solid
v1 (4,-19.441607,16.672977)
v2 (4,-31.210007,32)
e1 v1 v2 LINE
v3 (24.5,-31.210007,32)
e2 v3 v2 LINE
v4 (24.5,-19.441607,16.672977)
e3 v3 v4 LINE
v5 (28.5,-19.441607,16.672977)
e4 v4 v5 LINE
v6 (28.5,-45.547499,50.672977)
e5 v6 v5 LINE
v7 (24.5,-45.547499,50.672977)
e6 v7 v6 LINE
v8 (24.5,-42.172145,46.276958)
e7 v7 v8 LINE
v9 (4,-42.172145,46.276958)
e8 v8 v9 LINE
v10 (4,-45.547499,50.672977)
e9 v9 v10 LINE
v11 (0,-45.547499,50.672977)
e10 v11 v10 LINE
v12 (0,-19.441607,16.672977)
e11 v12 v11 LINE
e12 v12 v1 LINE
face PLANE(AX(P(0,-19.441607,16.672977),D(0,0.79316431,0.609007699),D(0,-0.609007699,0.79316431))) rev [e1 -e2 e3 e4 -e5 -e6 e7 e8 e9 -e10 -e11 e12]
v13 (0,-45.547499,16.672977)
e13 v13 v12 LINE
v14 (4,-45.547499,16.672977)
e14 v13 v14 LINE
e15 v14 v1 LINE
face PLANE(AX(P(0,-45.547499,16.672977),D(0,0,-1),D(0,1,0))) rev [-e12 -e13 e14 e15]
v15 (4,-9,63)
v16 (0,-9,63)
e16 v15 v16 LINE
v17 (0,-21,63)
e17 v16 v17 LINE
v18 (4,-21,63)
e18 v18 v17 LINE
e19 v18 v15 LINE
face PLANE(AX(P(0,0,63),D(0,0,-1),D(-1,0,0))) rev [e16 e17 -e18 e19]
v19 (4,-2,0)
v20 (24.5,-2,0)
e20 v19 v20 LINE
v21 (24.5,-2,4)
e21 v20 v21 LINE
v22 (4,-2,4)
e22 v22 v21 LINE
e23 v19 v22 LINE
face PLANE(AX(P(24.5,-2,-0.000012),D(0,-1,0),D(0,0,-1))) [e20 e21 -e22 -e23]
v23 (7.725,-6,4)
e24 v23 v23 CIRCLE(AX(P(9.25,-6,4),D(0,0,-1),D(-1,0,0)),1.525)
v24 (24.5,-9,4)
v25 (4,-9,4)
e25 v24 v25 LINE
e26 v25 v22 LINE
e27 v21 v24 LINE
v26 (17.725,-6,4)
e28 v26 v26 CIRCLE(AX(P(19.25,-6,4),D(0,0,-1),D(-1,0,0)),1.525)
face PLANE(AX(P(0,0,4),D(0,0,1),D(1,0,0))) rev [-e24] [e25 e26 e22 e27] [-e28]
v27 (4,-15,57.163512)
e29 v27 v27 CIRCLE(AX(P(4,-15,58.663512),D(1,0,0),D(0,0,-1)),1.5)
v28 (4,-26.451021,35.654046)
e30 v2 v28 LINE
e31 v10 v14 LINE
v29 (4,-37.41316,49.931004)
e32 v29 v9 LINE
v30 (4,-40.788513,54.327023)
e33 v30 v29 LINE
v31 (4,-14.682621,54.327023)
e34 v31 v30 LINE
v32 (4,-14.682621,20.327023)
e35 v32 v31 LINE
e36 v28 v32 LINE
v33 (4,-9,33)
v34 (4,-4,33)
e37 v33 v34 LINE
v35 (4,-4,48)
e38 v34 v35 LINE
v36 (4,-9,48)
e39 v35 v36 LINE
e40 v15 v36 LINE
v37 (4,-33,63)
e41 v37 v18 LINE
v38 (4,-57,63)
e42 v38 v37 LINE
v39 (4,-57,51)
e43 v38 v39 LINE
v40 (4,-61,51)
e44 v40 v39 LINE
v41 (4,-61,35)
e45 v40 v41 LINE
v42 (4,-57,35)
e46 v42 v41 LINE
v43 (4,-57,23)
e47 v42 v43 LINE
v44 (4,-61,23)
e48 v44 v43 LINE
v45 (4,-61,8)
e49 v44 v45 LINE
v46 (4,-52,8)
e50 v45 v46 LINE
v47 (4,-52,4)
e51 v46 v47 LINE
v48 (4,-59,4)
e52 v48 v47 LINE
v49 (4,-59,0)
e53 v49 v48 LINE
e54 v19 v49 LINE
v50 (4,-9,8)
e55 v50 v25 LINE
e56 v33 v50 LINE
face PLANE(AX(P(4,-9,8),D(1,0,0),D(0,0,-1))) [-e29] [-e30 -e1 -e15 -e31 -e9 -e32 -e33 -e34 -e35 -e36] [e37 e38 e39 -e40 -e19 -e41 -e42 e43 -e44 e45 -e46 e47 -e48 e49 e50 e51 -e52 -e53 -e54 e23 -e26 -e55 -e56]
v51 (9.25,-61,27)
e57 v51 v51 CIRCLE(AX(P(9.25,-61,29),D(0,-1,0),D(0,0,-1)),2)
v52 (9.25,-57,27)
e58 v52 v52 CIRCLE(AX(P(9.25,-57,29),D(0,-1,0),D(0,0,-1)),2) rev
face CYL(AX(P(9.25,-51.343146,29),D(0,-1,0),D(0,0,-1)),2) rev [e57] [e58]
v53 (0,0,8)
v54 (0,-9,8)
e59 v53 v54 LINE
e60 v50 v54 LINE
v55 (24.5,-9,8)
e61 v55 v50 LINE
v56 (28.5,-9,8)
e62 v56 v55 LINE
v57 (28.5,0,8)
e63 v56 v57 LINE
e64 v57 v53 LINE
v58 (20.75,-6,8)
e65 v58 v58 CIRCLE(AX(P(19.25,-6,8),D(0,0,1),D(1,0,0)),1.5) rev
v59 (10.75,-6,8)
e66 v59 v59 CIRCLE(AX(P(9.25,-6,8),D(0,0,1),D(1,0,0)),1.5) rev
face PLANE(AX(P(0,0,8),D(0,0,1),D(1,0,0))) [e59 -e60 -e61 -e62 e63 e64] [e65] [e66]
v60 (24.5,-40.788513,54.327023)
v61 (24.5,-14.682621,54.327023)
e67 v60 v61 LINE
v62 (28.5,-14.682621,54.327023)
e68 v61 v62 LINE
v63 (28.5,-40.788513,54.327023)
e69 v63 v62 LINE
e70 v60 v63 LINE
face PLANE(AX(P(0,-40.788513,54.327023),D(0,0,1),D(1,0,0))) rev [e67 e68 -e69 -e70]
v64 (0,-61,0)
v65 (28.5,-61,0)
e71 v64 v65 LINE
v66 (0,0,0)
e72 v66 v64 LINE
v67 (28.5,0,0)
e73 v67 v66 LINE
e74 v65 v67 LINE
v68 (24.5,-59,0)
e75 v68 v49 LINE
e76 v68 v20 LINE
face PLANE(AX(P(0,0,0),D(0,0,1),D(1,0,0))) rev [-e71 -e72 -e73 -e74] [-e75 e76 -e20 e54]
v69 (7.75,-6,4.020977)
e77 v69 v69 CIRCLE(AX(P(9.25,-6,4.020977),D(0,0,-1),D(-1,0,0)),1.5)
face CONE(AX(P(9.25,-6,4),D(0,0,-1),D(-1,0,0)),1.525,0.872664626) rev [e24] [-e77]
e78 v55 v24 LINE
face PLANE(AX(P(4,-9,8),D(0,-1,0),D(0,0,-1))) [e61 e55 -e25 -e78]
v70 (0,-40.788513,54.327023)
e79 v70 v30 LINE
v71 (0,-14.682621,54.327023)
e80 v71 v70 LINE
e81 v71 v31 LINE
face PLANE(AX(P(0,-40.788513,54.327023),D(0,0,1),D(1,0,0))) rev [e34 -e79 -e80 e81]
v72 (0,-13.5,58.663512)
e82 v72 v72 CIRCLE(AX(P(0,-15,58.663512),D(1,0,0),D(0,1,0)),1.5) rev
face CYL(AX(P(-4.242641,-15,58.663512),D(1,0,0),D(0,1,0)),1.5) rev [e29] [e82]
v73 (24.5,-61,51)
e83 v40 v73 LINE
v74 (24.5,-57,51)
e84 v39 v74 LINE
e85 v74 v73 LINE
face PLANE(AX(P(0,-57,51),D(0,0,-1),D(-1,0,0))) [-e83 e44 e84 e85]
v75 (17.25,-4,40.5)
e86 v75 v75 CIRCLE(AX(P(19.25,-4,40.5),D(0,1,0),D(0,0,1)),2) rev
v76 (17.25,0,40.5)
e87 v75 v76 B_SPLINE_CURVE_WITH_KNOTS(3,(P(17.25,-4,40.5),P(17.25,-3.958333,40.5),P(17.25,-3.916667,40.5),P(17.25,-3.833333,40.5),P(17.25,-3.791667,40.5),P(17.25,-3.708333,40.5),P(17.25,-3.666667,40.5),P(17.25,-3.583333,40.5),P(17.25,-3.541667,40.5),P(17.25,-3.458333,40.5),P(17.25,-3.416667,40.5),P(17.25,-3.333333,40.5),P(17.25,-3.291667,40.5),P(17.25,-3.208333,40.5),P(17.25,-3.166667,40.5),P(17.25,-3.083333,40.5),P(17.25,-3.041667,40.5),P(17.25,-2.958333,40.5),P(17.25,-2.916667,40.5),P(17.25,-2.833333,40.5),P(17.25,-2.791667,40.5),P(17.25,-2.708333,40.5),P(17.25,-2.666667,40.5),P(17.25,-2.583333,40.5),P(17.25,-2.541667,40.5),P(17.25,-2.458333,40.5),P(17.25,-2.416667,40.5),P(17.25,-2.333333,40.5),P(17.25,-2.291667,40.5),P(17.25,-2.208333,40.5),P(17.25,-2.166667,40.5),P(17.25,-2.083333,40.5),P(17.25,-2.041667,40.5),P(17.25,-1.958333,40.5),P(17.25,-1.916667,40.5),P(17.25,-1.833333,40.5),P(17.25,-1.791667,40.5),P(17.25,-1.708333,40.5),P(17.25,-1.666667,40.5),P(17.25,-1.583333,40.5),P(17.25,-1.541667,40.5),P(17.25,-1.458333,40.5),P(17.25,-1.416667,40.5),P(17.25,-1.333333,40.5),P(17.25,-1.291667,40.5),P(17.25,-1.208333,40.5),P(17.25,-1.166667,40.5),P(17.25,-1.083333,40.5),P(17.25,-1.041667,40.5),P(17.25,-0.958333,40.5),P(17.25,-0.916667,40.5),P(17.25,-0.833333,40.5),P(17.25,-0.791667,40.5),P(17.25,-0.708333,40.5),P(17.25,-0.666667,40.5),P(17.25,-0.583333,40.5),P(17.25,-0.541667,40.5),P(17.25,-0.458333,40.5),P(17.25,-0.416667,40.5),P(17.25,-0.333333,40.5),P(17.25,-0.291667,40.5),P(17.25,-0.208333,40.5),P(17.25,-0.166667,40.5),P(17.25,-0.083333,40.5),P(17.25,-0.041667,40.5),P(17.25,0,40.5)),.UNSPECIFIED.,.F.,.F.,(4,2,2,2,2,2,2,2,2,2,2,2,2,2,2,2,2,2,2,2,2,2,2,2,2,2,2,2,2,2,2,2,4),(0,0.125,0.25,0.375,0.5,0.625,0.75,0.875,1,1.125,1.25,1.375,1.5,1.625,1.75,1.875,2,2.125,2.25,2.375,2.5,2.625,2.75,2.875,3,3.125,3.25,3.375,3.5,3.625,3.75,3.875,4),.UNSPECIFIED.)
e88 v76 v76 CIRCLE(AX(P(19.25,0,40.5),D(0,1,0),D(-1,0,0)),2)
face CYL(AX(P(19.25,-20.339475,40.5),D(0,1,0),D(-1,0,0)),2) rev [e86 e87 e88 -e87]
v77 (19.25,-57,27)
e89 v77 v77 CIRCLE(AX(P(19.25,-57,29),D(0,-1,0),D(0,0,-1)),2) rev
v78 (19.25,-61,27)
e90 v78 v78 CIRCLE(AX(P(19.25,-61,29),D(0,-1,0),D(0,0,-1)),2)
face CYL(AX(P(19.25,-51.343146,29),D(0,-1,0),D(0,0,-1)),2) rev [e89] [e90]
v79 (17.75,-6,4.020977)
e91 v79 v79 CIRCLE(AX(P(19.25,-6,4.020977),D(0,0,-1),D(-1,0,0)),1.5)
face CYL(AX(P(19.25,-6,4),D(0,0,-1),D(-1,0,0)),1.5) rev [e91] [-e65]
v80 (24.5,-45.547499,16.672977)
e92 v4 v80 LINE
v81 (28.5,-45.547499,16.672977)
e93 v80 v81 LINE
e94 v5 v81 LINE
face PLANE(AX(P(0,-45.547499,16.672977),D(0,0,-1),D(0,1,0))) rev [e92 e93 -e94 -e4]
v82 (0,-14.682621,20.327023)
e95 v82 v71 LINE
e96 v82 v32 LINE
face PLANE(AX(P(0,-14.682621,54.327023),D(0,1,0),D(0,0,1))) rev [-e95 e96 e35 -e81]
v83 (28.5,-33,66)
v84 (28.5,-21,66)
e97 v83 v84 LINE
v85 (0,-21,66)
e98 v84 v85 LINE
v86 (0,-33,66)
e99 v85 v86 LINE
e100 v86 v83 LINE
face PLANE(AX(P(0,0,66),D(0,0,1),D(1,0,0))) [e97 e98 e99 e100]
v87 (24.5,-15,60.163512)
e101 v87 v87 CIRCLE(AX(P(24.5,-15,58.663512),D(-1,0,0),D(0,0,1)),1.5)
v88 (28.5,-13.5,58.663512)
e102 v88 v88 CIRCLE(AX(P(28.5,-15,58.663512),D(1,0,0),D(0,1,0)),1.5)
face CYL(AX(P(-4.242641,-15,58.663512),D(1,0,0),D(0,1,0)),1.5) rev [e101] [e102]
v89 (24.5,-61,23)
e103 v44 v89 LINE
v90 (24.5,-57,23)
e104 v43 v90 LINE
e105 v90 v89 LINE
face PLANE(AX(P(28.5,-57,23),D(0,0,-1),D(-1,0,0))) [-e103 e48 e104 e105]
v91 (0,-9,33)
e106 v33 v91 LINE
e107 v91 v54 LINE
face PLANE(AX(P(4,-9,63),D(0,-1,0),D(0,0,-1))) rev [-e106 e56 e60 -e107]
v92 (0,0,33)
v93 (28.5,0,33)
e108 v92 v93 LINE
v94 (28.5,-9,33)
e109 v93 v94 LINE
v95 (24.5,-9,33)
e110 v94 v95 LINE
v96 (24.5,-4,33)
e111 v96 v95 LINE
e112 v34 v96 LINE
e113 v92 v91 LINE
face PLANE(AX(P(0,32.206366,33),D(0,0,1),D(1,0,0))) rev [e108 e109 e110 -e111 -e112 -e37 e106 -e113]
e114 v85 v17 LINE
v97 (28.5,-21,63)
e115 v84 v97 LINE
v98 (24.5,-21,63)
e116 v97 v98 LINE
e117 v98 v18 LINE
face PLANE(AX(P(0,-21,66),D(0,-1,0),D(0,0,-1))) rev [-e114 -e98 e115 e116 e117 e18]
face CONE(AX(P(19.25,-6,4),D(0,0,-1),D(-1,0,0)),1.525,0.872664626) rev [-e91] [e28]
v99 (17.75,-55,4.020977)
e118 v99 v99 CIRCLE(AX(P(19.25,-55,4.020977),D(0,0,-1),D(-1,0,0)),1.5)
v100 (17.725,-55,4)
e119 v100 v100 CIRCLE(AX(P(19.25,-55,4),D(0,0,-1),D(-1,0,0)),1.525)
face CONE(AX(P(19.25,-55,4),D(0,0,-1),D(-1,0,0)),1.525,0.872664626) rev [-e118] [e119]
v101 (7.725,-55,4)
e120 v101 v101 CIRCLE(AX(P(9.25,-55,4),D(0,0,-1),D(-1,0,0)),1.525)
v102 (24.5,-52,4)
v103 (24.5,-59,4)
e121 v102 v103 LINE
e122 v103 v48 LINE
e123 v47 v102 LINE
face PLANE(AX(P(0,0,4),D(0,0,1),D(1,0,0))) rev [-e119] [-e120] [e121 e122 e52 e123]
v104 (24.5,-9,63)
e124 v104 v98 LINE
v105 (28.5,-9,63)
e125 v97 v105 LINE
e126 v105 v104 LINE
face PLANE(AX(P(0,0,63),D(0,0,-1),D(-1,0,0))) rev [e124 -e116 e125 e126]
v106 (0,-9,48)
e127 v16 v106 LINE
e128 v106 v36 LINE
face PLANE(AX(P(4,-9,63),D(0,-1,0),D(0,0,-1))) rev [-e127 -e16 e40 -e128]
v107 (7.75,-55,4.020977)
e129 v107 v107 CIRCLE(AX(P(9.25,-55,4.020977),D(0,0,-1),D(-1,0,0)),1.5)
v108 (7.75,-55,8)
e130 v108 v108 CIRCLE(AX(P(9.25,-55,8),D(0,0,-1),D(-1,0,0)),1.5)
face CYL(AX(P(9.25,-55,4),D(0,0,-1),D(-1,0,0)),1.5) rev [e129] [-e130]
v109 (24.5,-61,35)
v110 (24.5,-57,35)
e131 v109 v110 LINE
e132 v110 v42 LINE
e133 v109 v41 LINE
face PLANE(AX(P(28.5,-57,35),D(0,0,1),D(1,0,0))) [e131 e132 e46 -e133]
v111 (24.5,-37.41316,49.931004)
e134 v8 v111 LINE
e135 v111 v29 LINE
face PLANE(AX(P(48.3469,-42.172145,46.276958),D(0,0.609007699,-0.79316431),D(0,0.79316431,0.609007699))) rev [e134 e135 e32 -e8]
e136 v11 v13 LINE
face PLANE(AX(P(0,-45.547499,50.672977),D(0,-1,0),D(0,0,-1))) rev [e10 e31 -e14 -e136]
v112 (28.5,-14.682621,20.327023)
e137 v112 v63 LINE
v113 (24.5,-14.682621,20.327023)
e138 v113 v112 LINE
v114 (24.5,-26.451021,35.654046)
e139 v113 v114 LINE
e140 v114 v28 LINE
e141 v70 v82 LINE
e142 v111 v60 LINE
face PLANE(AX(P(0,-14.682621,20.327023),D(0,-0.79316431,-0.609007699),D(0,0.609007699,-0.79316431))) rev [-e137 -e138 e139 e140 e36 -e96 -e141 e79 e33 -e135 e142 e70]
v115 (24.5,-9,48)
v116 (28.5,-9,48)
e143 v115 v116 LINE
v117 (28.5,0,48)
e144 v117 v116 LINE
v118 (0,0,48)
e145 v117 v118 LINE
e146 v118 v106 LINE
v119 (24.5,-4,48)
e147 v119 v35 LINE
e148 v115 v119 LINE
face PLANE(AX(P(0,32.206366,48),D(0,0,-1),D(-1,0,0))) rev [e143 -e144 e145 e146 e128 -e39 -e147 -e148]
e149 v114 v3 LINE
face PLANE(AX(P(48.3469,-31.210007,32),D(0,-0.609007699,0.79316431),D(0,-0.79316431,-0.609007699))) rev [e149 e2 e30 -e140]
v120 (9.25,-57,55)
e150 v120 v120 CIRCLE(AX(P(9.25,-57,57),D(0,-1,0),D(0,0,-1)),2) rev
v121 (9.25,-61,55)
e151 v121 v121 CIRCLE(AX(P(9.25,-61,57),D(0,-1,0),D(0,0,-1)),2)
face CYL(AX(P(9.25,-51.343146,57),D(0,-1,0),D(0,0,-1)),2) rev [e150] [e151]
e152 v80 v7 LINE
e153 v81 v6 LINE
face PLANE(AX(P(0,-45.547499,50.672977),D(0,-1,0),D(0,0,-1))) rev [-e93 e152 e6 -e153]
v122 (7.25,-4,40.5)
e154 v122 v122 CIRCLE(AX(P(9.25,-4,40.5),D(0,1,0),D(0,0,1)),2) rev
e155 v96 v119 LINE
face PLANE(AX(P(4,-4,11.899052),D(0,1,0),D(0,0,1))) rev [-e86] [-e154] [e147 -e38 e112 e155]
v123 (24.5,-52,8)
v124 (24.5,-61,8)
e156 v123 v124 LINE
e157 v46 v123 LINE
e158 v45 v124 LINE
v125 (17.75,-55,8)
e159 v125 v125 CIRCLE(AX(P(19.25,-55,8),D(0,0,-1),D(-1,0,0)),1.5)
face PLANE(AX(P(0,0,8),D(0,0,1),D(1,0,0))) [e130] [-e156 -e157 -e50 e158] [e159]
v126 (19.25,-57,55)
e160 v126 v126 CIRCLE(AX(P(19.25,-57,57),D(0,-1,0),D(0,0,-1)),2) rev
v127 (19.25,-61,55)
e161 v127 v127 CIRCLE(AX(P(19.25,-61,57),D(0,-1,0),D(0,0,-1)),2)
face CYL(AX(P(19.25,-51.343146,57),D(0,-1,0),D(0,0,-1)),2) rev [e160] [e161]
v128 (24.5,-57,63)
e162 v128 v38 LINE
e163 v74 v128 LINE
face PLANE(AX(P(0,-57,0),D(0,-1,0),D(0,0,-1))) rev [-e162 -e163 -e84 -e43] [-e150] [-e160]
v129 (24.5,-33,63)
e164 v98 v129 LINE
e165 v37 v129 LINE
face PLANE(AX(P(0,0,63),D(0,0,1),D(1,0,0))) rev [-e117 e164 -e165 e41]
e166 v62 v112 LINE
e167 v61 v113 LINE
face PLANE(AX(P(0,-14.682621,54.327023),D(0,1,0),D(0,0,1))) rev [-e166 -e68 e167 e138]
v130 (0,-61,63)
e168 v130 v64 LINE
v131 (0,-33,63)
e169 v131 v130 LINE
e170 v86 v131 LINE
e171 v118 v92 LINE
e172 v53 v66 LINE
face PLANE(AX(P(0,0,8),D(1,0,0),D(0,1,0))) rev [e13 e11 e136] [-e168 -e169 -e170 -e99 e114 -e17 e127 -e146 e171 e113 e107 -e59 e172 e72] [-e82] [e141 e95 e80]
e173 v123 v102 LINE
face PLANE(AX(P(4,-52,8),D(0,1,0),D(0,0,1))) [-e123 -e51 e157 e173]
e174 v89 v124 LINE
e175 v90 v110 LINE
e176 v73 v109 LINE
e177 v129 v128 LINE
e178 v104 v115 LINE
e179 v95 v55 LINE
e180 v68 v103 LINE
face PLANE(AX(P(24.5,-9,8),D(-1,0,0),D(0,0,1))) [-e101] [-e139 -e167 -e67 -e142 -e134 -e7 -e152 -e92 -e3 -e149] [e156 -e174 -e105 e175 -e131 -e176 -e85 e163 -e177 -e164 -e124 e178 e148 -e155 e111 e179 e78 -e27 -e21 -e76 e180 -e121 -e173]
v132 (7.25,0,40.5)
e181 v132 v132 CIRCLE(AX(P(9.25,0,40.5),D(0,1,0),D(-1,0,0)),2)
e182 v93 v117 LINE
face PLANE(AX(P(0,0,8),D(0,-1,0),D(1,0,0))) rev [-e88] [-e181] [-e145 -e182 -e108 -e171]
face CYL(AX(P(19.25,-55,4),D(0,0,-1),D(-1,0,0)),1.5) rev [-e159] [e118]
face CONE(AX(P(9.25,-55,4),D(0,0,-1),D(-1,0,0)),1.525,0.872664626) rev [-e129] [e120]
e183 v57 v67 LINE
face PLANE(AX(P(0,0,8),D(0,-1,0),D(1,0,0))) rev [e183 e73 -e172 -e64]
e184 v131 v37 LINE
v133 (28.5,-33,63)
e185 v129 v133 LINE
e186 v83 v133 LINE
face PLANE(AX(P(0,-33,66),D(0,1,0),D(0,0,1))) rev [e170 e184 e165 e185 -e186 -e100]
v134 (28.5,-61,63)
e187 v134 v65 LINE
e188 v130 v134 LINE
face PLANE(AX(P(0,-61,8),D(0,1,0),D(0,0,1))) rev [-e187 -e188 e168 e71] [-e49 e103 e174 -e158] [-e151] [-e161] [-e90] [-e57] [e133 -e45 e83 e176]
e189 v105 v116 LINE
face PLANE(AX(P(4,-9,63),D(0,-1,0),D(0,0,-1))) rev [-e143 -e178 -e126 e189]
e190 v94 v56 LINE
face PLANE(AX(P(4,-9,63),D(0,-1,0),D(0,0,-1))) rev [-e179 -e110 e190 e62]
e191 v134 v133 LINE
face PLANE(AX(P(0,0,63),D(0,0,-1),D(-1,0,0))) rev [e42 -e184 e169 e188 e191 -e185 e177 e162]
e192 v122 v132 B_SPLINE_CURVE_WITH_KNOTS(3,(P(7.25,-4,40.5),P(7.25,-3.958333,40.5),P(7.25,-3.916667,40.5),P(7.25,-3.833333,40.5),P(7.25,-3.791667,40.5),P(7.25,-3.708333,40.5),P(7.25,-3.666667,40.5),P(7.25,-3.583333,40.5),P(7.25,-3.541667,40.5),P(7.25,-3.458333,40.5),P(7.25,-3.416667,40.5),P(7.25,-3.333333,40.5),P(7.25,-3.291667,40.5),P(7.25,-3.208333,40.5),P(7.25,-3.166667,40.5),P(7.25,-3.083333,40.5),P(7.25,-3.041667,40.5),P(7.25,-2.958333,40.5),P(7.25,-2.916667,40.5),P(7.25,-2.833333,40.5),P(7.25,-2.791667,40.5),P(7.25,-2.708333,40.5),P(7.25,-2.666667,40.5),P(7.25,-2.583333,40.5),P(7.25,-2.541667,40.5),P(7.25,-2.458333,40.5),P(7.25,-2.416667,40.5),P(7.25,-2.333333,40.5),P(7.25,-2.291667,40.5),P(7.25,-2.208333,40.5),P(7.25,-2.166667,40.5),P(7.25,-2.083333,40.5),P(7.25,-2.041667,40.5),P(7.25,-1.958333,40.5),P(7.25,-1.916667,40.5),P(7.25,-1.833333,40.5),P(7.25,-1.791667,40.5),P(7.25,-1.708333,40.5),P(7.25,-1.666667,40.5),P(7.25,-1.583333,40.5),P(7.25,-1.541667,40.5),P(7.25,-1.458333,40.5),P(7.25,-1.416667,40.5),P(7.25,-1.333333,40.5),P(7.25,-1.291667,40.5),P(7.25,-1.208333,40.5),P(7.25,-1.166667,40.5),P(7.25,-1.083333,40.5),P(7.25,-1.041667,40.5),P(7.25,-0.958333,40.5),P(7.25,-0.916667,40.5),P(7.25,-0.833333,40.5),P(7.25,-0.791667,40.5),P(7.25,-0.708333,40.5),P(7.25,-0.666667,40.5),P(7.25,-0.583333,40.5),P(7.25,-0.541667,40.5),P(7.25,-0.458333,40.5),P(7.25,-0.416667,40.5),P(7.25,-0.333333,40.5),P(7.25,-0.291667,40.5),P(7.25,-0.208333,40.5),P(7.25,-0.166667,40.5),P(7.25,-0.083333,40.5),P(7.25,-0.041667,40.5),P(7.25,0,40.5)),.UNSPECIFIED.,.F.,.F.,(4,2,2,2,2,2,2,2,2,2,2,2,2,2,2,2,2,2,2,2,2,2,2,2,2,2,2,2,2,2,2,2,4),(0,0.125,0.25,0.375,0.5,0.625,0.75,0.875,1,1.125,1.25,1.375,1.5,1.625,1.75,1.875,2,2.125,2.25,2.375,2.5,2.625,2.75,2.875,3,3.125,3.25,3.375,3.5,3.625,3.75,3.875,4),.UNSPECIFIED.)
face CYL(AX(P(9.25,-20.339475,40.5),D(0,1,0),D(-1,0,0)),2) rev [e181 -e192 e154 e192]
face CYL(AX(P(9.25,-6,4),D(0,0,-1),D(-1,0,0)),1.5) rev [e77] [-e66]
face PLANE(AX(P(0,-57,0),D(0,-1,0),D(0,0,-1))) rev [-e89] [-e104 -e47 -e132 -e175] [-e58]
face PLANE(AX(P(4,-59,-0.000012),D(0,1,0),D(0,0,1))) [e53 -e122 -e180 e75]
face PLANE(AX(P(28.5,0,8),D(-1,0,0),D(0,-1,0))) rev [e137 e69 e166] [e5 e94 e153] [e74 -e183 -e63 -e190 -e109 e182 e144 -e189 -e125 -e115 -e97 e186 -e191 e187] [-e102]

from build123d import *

# Parameters (mm, degrees)
SKETCH1_W                       = 28.5
SKETCH1_H                       = 61
SKETCH1_W_2                     = 20.5
SKETCH1_H_2                     = 43
BOSS_EXTRUDE1_DEPTH             = 8
SKETCH2_W                       = 4
SKETCH2_H                       = 52
BOSS_EXTRUDE2_DEPTH             = 55
SKETCH3_W                       = 28.5
SKETCH3_H                       = 12
BOSS_EXTRUDE3_DEPTH             = 4
CUT_EXTRUDE1_DEPTH              = 93.207646104
CUT_EXTRUDE1_DEPTH_BACK         = 93.207646104
SKETCH5_W                       = 15
SKETCH5_H                       = 5.682620757
BOSS_EXTRUDE4_DEPTH             = 20.5
CUT_EXTRUDE2_DEPTH              = 93.207646104
CUT_EXTRUDE2_DEPTH_BACK         = 4
SKETCH7_W                       = 20.5
SKETCH7_H                       = 7
F_3_0MM_DOWEL_HOLE1_D           = 3
F_3_0MM_DOWEL_HOLE1_DEPTH       = 4
F_3_0MM_DOWEL_HOLE1_CSINK_D     = 3.05
F_3_0MM_DOWEL_HOLE1_CSINK_ANGLE = 100
F_3_0MM_DOWEL_HOLE1_TIP         = 0.901290929
SKETCH19_R                      = 2
CUT_EXTRUDE3_DEPTH              = 4
SKETCH21_W                      = 28.5
SKETCH21_H                      = 15
BOSS_EXTRUDE5_DEPTH             = 9
SKETCH24_R                      = 2
CUT_EXTRUDE6_DEPTH              = 14.682620757
CUT_EXTRUDE7_START              = -15
CUT_EXTRUDE7_OUTLINE_W          = 20.5
CUT_EXTRUDE7_OUTLINE_H          = 5.682620757
CUT_EXTRUDE7_DEPTH              = 15
BOSS_EXTRUDE6_DEPTH             = 20.5
SKETCH27_W                      = 28.5
SKETCH27_H                      = 12
BOSS_EXTRUDE7_DEPTH             = 3
SKETCH28_W                      = 20.5
SKETCH28_H                      = 5
CUT_EXTRUDE8_DEPTH              = 15
CUT_EXTRUDE9_START              = -28.5
SKETCH29_R                      = 1.5
CUT_EXTRUDE9_DEPTH              = 28.5


# Read off the part's stored shape, not the designer's step: Cut-Extrude7
with BuildPart() as part:
    # Sketch1 → Boss-Extrude1 (new body)
    with BuildSketch(Plane.XY):
        with Locations((14.25, -30.5)):
            Rectangle(SKETCH1_W, SKETCH1_H)
        with Locations((14.25, -30.5)):
            Rectangle(SKETCH1_W_2, SKETCH1_H_2, mode=Mode.SUBTRACT)
    extrude(amount=BOSS_EXTRUDE1_DEPTH)

    # Sketch2 → Boss-Extrude2 (add)
    with BuildSketch(Plane.XY.offset(8)):
        with Locations((2, -35)):
            Rectangle(SKETCH2_W, SKETCH2_H)
        with Locations((26.5, -35)):
            Rectangle(SKETCH2_W, SKETCH2_H)
    extrude(amount=BOSS_EXTRUDE2_DEPTH)

    # Sketch3 → Boss-Extrude3 (add)
    with BuildSketch(Plane.XZ.offset(61)):
        with Locations((14.25, 57)):
            Rectangle(SKETCH3_W, SKETCH3_H)
        with Locations((14.25, 29)):
            Rectangle(SKETCH3_W, SKETCH3_H)
    extrude(amount=-BOSS_EXTRUDE3_DEPTH)

    # Sketch4 → Cut-Extrude1 (cut, two sides: drawn at the far end of the back side and taken through both)
    with BuildSketch(Plane(origin=(28.5, 0, 0), x_dir=(0, 0, -1), z_dir=(1, 0, 0)).offset(-CUT_EXTRUDE1_DEPTH_BACK)):
        Polygon((-54.327023097, -40.788512694), (-54.327023097, -14.682620757), (-20.327023097, -14.682620757), align=None)
        Polygon((-50.672976903, -45.547498554), (-16.672976903, -45.547498554), (-16.672976903, -19.441606616), align=None)
    extrude(amount=CUT_EXTRUDE1_DEPTH + CUT_EXTRUDE1_DEPTH_BACK, mode=Mode.SUBTRACT)

    # Sketch5 → Boss-Extrude4 (add)
    with BuildSketch(Plane(origin=(4, 0, 0), x_dir=(0, 0, -1), z_dir=(1, 0, 0))):
        with Locations((-30.827023097, -11.841310379)):
            Rectangle(SKETCH5_W, SKETCH5_H)
    extrude(amount=BOSS_EXTRUDE4_DEPTH)

    # Sketch7 → Cut-Extrude2 (cut, two sides: drawn at the far end of the back side and taken through both)
    with BuildSketch(Plane(origin=(0, 0, 0), x_dir=(-1, 0, 0), z_dir=(0, 0, -1)).offset(-CUT_EXTRUDE2_DEPTH_BACK)):
        with Locations((-14.25, -5.5)):
            Rectangle(SKETCH7_W, SKETCH7_H)
        with Locations((-14.25, -55.5)):
            Rectangle(SKETCH7_W, SKETCH7_H)
    extrude(amount=CUT_EXTRUDE2_DEPTH + CUT_EXTRUDE2_DEPTH_BACK, mode=Mode.SUBTRACT)

    # Ø3.0mm Dowel Hole1
    with Locations(Plane(origin=(0, 0, 4), x_dir=(-1, 0, 0), z_dir=(0, 0, -1))):
        with Locations((-19.25, -55), (-9.25, -55), (-19.25, -6), (-9.25, -6)):
            CounterSinkHole(F_3_0MM_DOWEL_HOLE1_D / 2, F_3_0MM_DOWEL_HOLE1_CSINK_D / 2, depth=F_3_0MM_DOWEL_HOLE1_DEPTH, counter_sink_angle=F_3_0MM_DOWEL_HOLE1_CSINK_ANGLE)
            with Locations((0, 0, -(F_3_0MM_DOWEL_HOLE1_DEPTH + F_3_0MM_DOWEL_HOLE1_TIP / 2))):  # 118° drill point
                Cone(0, F_3_0MM_DOWEL_HOLE1_D / 2, F_3_0MM_DOWEL_HOLE1_TIP, mode=Mode.SUBTRACT)

    # Sketch19 → Cut-Extrude3 (cut)
    with BuildSketch(Plane.XZ.offset(61)):
        with Locations(Location((9.25, 57, 0), (0, 0, 270))):
            Circle(SKETCH19_R)
        with Locations(Location((19.25, 57, 0), (0, 0, 270))):
            Circle(SKETCH19_R)
        with Locations(Location((9.25, 29, 0), (0, 0, 270))):
            Circle(SKETCH19_R)
        with Locations(Location((19.25, 29, 0), (0, 0, 270))):
            Circle(SKETCH19_R)
    extrude(amount=-CUT_EXTRUDE3_DEPTH, mode=Mode.SUBTRACT)

    # Sketch21 → Boss-Extrude5 (add)
    with BuildSketch(Plane(origin=(0, -9, 0), x_dir=(1, 0, 0), z_dir=(0, 1, 0))):
        with Locations((14.25, -40.5)):
            Rectangle(SKETCH21_W, SKETCH21_H)
    extrude(amount=BOSS_EXTRUDE5_DEPTH)

    # Sketch24 → Cut-Extrude6 (cut)
    with BuildSketch(Plane(origin=(0, 0, 0), x_dir=(1, 0, 0), z_dir=(0, 1, 0))):
        with Locations(Location((9.25, -40.5, 0), (0, 0, 180))):
            Circle(SKETCH24_R)
        with Locations(Location((19.25, -40.5, 0), (0, 0, 180))):
            Circle(SKETCH24_R)
    extrude(amount=-CUT_EXTRUDE6_DEPTH, mode=Mode.SUBTRACT)

    # Cut-Extrude7 outline → Cut-Extrude7 (cut)
    with BuildSketch(Plane.XY.offset(38.327023097).offset(CUT_EXTRUDE7_START)):
        with Locations((14.25, -11.841310379)):
            Rectangle(CUT_EXTRUDE7_OUTLINE_W, CUT_EXTRUDE7_OUTLINE_H)
    extrude(amount=CUT_EXTRUDE7_DEPTH, mode=Mode.SUBTRACT)

    # Sketch26 → Boss-Extrude6 (add)
    with BuildSketch(Plane(origin=(4, 0, 0), x_dir=(0, 0, -1), z_dir=(1, 0, 0))):
        Polygon((-46.276957579, -42.172145453), (-49.931003773, -37.413159593), (-35.654046194, -26.451021012), (-32, -31.210006872), align=None)
    extrude(amount=BOSS_EXTRUDE6_DEPTH)

    # Sketch27 → Boss-Extrude7 (add)
    with BuildSketch(Plane.XY.offset(63)):
        with Locations((14.25, -27)):
            Rectangle(SKETCH27_W, SKETCH27_H)
    extrude(amount=BOSS_EXTRUDE7_DEPTH)

    # Sketch28 → Cut-Extrude8 (cut)
    with BuildSketch(Plane.XY.offset(48)):
        with Locations((14.25, -6.5)):
            Rectangle(SKETCH28_W, SKETCH28_H)
    extrude(amount=-CUT_EXTRUDE8_DEPTH, mode=Mode.SUBTRACT)

    # Sketch29 → Cut-Extrude9 (cut)
    with BuildSketch(Plane(origin=(28.5, 0, 0), x_dir=(0, 0, -1), z_dir=(1, 0, 0)).offset(CUT_EXTRUDE9_START)):
        with Locations(Location((-58.663511548, -15, 0), (0, 0, 90))):
            Circle(SKETCH29_R)
    extrude(amount=CUT_EXTRUDE9_DEPTH, mode=Mode.SUBTRACT)


solid = part.part
